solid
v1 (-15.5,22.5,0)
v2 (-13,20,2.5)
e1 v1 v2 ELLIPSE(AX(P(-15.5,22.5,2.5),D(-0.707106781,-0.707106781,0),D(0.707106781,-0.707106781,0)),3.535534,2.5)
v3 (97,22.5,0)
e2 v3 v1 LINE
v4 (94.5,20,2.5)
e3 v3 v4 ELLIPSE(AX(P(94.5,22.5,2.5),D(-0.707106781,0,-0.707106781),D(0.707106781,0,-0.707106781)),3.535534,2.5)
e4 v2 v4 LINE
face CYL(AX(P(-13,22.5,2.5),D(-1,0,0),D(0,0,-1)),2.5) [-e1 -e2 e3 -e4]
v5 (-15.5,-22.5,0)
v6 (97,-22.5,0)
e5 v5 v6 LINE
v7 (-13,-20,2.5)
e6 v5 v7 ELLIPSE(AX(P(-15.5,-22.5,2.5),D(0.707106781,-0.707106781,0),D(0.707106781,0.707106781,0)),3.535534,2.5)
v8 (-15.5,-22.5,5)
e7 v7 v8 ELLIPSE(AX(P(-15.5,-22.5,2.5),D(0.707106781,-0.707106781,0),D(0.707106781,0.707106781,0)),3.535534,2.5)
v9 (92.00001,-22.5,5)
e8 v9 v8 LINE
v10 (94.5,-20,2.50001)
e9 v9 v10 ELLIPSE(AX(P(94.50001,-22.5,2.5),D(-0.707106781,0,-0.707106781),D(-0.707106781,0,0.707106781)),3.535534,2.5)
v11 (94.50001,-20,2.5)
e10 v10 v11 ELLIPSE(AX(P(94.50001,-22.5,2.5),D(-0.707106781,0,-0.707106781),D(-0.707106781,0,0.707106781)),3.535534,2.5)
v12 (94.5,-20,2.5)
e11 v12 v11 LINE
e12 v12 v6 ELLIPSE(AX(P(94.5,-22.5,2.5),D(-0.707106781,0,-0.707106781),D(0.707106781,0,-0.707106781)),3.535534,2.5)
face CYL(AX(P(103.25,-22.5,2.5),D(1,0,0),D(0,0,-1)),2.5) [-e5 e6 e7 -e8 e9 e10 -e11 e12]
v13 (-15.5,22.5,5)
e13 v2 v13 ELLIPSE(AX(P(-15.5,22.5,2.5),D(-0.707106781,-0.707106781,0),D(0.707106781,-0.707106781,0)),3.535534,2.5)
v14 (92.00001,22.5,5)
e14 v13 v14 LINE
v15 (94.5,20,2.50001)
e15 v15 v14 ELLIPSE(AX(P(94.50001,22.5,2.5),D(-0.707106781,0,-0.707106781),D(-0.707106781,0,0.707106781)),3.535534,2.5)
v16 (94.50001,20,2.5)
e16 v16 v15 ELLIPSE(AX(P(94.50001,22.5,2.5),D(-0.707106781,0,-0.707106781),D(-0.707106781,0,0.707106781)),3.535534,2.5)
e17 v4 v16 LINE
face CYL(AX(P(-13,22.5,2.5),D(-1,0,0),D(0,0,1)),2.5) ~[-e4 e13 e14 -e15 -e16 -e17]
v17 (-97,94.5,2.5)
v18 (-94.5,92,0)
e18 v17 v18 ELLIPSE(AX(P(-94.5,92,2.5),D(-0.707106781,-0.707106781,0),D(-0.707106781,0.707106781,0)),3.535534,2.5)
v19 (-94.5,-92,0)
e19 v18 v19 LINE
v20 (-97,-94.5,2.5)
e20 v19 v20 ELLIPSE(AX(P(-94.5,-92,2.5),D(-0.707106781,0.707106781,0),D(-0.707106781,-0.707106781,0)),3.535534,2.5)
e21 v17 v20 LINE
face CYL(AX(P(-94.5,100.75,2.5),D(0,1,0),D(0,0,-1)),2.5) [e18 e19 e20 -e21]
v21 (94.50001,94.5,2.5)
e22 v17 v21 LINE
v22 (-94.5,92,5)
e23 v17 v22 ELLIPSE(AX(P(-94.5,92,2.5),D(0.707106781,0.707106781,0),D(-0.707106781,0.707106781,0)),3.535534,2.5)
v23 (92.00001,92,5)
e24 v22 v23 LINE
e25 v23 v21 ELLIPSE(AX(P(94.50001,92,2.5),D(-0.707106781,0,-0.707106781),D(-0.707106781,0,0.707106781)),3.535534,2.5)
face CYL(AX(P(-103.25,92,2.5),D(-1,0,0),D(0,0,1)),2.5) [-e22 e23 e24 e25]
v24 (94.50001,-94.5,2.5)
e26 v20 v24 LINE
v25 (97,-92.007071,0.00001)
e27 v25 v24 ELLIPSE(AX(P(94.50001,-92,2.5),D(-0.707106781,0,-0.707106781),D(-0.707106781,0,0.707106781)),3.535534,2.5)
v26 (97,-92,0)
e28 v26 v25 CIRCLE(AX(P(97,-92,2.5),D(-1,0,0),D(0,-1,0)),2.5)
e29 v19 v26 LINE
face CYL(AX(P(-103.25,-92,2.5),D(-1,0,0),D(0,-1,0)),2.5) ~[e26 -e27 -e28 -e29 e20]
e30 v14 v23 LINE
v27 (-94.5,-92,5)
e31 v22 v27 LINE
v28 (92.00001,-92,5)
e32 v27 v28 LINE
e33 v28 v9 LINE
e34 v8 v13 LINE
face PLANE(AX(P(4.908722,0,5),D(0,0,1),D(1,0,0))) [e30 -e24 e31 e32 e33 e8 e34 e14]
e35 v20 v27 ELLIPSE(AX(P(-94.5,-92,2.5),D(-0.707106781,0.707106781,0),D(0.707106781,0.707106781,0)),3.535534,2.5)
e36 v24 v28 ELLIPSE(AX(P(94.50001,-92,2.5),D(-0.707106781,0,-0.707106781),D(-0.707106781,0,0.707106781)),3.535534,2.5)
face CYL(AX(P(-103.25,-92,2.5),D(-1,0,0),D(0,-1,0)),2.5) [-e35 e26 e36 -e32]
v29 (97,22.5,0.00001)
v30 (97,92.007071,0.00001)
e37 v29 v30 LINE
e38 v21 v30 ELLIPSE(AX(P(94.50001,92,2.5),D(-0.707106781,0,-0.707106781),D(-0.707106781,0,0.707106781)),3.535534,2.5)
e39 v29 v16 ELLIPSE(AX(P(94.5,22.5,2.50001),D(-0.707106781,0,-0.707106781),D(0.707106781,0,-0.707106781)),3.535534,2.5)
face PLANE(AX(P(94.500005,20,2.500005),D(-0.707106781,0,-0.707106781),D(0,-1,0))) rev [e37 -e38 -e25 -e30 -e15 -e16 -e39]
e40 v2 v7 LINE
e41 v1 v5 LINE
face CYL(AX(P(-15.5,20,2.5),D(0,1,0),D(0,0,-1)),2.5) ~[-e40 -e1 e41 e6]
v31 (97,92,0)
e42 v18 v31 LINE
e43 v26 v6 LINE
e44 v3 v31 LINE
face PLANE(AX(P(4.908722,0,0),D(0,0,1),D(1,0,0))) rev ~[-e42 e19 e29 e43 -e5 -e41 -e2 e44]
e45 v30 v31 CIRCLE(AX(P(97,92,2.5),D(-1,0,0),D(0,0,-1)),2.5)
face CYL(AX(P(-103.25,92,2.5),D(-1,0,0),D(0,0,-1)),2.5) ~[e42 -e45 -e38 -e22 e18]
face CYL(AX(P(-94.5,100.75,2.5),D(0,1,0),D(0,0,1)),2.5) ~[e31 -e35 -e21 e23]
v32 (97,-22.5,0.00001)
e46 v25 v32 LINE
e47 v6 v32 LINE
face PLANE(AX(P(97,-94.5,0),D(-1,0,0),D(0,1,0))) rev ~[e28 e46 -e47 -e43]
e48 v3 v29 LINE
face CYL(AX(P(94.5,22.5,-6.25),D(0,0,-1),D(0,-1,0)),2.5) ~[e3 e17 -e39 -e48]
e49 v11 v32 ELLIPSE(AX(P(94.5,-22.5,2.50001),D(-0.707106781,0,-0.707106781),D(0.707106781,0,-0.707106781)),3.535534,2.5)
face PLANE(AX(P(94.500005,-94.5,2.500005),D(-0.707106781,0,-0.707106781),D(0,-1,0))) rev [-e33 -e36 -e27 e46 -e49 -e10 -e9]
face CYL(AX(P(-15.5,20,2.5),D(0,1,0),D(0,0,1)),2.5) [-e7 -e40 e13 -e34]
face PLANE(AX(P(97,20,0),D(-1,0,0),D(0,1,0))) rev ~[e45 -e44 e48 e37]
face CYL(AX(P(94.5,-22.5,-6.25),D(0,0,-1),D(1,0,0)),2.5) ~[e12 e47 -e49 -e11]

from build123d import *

# Parameters (mm, degrees)
F1_DEPTH     = 5
F2_SIZE      = 4.99999
F3_T1_DEPTH  = 40
F3_T3_DEPTH  = 111.25001
F3_T5_DEPTH  = 12.50001
F3_T7_DEPTH  = 116.25
F3_T9_DEPTH  = 206.5
F3_T11_DEPTH = 201.5
F3_T13_DEPTH = 201.50001
F3_T19_DEPTH = 117.50001
F3_T23_DEPTH = 46.25
F3_T30_DEPTH = 46.25
F3_T34_DEPTH = 117.50001
F3_T41_DEPTH = 122.5
F3_T45_DEPTH = 46.25
F3_T52_DEPTH = 46.25
F3_T56_DEPTH = 122.5


# Not quite as in the source:
# - a fillet or chamfer that OpenCascade refuses, or shapes differently, is made with other operations: its cross-section is extruded or revolved along the edge and cut away or added
# - a fillet or chamfer is up to 0.001 mm smaller than in the source, because OpenCascade refuses the exact size


with BuildPart() as f1:
    # F0 (on Top) → F1 (new body)
    with BuildSketch(Plane.XY):
        Polygon((-97, -94.5), (97, -94.5), (97, -20), (-13, -20), (-13, 20), (97, 20), (97, 94.5), (-97, 94.5), align=None)
    extrude(amount=F1_DEPTH)

    # F2 (size 5 in the source; OpenCascade refuses exactly that, so slightly less here)
    f2_edges = [f1.edges().sort_by_distance(p)[0] for p in [
        (97, -57.25, 5),
        (97, 57.25, 5),
    ]]
    chamfer(f2_edges, length=F2_SIZE)

    # F3: fillet of radius 2.5 on 14 edges, made by hand

    # F3_s2 → F3_t1 (cut)
    with BuildSketch(Plane.XZ.offset(-20)):
        with BuildLine():
            ThreePointArc((-15.5, 5), (-13.732233047, 4.267766953), (-13, 2.5))
            Line((-13, 2.5), (-13, 5))
            Line((-13, 5), (-15.5, 5))
        make_face()
        with BuildLine():
            ThreePointArc((-15.5, 0), (-13.732233047, 0.732233047), (-13, 2.5))
            Line((-13, 2.5), (-13, 0))
            Line((-13, 0), (-15.5, 0))
        make_face()
    extrude(amount=F3_T1_DEPTH, mode=Mode.SUBTRACT)

    # F3_s4 → F3_t3 (cut)
    with BuildSketch(Plane.YZ.offset(-13)):
        with BuildLine():
            ThreePointArc((22.5, 5), (20.732233047, 4.267766953), (20, 2.5))
            Line((20, 2.5), (20, 5))
            Line((20, 5), (22.5, 5))
        make_face()
        with BuildLine():
            ThreePointArc((-22.5, 5), (-20.732233047, 4.267766953), (-20, 2.5))
            Line((-20, 2.5), (-20, 5))
            Line((-20, 5), (-22.5, 5))
        make_face()
    extrude(amount=F3_T3_DEPTH, mode=Mode.SUBTRACT)

    # F3_s6 → F3_t5 (cut)
    with BuildSketch(Plane.XY.offset(-6.25)):
        with BuildLine():
            ThreePointArc((97, -22.5), (96.267766953, -20.732233047), (94.5, -20))
            Line((94.5, -20), (97, -20))
            Line((97, -20), (97, -22.5))
        make_face()
        with BuildLine():
            ThreePointArc((94.5, 20), (96.267766953, 20.732233047), (97, 22.5))
            Line((97, 22.5), (97, 20))
            Line((97, 20), (94.5, 20))
        make_face()
    extrude(amount=F3_T5_DEPTH, mode=Mode.SUBTRACT)

    # F3_s8 → F3_t7 (cut)
    with BuildSketch(Plane.YZ.offset(-13)):
        with BuildLine():
            ThreePointArc((-22.5, 0), (-20.732233047, 0.732233047), (-20, 2.5))
            Line((-20, 2.5), (-20, 0))
            Line((-20, 0), (-22.5, 0))
        make_face()
        with BuildLine():
            ThreePointArc((22.5, 0), (20.732233047, 0.732233047), (20, 2.5))
            Line((20, 2.5), (20, 0))
            Line((20, 0), (22.5, 0))
        make_face()
    extrude(amount=F3_T7_DEPTH, mode=Mode.SUBTRACT)

    # F3_s10 → F3_t9 (cut)
    with BuildSketch(Plane.YZ.offset(-103.25)):
        with BuildLine():
            ThreePointArc((-94.5, 2.5), (-93.767766953, 0.732233047), (-92, 0))
            Line((-92, 0), (-94.5, 0))
            Line((-94.5, 0), (-94.5, 2.5))
        make_face()
        with BuildLine():
            ThreePointArc((92, 0), (93.767766953, 0.732233047), (94.5, 2.5))
            Line((94.5, 2.5), (94.5, 0))
            Line((94.5, 0), (92, 0))
        make_face()
    extrude(amount=F3_T9_DEPTH, mode=Mode.SUBTRACT)

    # F3_s12 → F3_t11 (cut)
    with BuildSketch(Plane.XZ.offset(-100.75)):
        with BuildLine():
            ThreePointArc((-94.5, 0), (-96.267766953, 0.732233047), (-97, 2.5))
            Line((-97, 2.5), (-97, 0))
            Line((-97, 0), (-94.5, 0))
        make_face()
        with BuildLine():
            ThreePointArc((-94.5, 5), (-96.267766953, 4.267766953), (-97, 2.5))
            Line((-97, 2.5), (-97, 5))
            Line((-97, 5), (-94.5, 5))
        make_face()
    extrude(amount=F3_T11_DEPTH, mode=Mode.SUBTRACT)

    # F3_s14 → F3_t13 (cut)
    with BuildSketch(Plane.YZ.offset(-103.25)):
        with BuildLine():
            ThreePointArc((92, 5), (93.767766953, 4.267766953), (94.5, 2.5))
            Line((94.5, 2.5), (94.5, 5))
            Line((94.5, 5), (92, 5))
        make_face()
        with BuildLine():
            ThreePointArc((-94.5, 2.5), (-93.767766953, 4.267766953), (-92, 5))
            Line((-92, 5), (-94.5, 5))
            Line((-94.5, 5), (-94.5, 2.5))
        make_face()
    extrude(amount=F3_T13_DEPTH, mode=Mode.SUBTRACT)


with BuildPart() as f3_tool17:
    # F3_s18 → F3_t19 (new body)
    with BuildSketch(Plane.YZ.offset(98.25001)):
        with BuildLine():
            ThreePointArc((-22.5, 5), (-20.732233047, 4.267766953), (-20, 2.5))
            Line((-20, 2.5), (-20, 5))
            Line((-20, 5), (-22.5, 5))
        make_face()
    extrude(amount=-F3_T19_DEPTH)

    split(bisect_by=Plane.YZ.offset(-13), keep=Keep.BOTTOM)


with BuildPart() as f3_tool21:
    # F3_s22 → F3_t23 (new body)
    with BuildSketch(Plane.XZ.offset(26.25)):
        with BuildLine():
            ThreePointArc((-15.5, 5), (-13.732233047, 4.267766953), (-13, 2.5))
            Line((-13, 2.5), (-13, 5))
            Line((-13, 5), (-15.5, 5))
        make_face()
    extrude(amount=-F3_T23_DEPTH)

    split(bisect_by=Plane.XZ.offset(20), keep=Keep.TOP)


with BuildPart() as f3_tool17_1:
    add(f3_tool17.part)

    # F3_t25: intersect F3_tool21
    add(f3_tool21.part, mode=Mode.INTERSECT)


with BuildPart() as f1_1:
    add(f1.part)

    # F3_t15: cut F3_tool17
    add(f3_tool17_1.part, mode=Mode.SUBTRACT)


with BuildPart() as f3_tool28:
    # F3_s29 → F3_t30 (new body)
    with BuildSketch(Plane.XZ.offset(20)):
        with BuildLine():
            ThreePointArc((-15.5, 5), (-13.732233047, 4.267766953), (-13, 2.5))
            Line((-13, 2.5), (-13, 5))
            Line((-13, 5), (-15.5, 5))
        make_face()
    extrude(amount=-F3_T30_DEPTH)

    split(bisect_by=Plane.XZ.offset(-20), keep=Keep.BOTTOM)


with BuildPart() as f3_tool32:
    # F3_s33 → F3_t34 (new body)
    with BuildSketch(Plane.YZ.offset(-19.25)):
        with BuildLine():
            ThreePointArc((22.5, 5), (20.732233047, 4.267766953), (20, 2.5))
            Line((20, 2.5), (20, 5))
            Line((20, 5), (22.5, 5))
        make_face()
    extrude(amount=F3_T34_DEPTH)

    split(bisect_by=Plane.YZ.offset(-13), keep=Keep.BOTTOM)


with BuildPart() as f3_tool28_1:
    add(f3_tool28.part)

    # F3_t36: intersect F3_tool32
    add(f3_tool32.part, mode=Mode.INTERSECT)


with BuildPart() as f1_2:
    add(f1_1.part)

    # F3_t26: cut F3_tool28
    add(f3_tool28_1.part, mode=Mode.SUBTRACT)


with BuildPart() as f3_tool39:
    # F3_s40 → F3_t41 (new body)
    with BuildSketch(Plane.YZ.offset(103.25)):
        with BuildLine():
            ThreePointArc((-22.5, 0), (-20.732233047, 0.732233047), (-20, 2.5))
            Line((-20, 2.5), (-20, 0))
            Line((-20, 0), (-22.5, 0))
        make_face()
    extrude(amount=-F3_T41_DEPTH)

    split(bisect_by=Plane.YZ.offset(-13), keep=Keep.BOTTOM)


with BuildPart() as f3_tool43:
    # F3_s44 → F3_t45 (new body)
    with BuildSketch(Plane.XZ.offset(26.25)):
        with BuildLine():
            ThreePointArc((-15.5, 0), (-13.732233047, 0.732233047), (-13, 2.5))
            Line((-13, 2.5), (-13, 0))
            Line((-13, 0), (-15.5, 0))
        make_face()
    extrude(amount=-F3_T45_DEPTH)

    split(bisect_by=Plane.XZ.offset(20), keep=Keep.TOP)


with BuildPart() as f3_tool39_1:
    add(f3_tool39.part)

    # F3_t47: intersect F3_tool43
    add(f3_tool43.part, mode=Mode.INTERSECT)


with BuildPart() as f1_3:
    add(f1_2.part)

    # F3_t37: cut F3_tool39
    add(f3_tool39_1.part, mode=Mode.SUBTRACT)


with BuildPart() as f3_tool50:
    # F3_s51 → F3_t52 (new body)
    with BuildSketch(Plane.XZ.offset(20)):
        with BuildLine():
            ThreePointArc((-15.5, 0), (-13.732233047, 0.732233047), (-13, 2.5))
            Line((-13, 2.5), (-13, 0))
            Line((-13, 0), (-15.5, 0))
        make_face()
    extrude(amount=-F3_T52_DEPTH)

    split(bisect_by=Plane.XZ.offset(-20), keep=Keep.BOTTOM)


with BuildPart() as f3_tool54:
    # F3_s55 → F3_t56 (new body)
    with BuildSketch(Plane.YZ.offset(-19.25)):
        with BuildLine():
            ThreePointArc((22.5, 0), (20.732233047, 0.732233047), (20, 2.5))
            Line((20, 2.5), (20, 0))
            Line((20, 0), (22.5, 0))
        make_face()
    extrude(amount=F3_T56_DEPTH)

    split(bisect_by=Plane.YZ.offset(-13), keep=Keep.BOTTOM)


with BuildPart() as f3_tool50_1:
    add(f3_tool50.part)

    # F3_t58: intersect F3_tool54
    add(f3_tool54.part, mode=Mode.INTERSECT)


with BuildPart() as f1_4:
    add(f1_3.part)

    # F3_t48: cut F3_tool50
    add(f3_tool50_1.part, mode=Mode.SUBTRACT)


solid = f1_4.part
